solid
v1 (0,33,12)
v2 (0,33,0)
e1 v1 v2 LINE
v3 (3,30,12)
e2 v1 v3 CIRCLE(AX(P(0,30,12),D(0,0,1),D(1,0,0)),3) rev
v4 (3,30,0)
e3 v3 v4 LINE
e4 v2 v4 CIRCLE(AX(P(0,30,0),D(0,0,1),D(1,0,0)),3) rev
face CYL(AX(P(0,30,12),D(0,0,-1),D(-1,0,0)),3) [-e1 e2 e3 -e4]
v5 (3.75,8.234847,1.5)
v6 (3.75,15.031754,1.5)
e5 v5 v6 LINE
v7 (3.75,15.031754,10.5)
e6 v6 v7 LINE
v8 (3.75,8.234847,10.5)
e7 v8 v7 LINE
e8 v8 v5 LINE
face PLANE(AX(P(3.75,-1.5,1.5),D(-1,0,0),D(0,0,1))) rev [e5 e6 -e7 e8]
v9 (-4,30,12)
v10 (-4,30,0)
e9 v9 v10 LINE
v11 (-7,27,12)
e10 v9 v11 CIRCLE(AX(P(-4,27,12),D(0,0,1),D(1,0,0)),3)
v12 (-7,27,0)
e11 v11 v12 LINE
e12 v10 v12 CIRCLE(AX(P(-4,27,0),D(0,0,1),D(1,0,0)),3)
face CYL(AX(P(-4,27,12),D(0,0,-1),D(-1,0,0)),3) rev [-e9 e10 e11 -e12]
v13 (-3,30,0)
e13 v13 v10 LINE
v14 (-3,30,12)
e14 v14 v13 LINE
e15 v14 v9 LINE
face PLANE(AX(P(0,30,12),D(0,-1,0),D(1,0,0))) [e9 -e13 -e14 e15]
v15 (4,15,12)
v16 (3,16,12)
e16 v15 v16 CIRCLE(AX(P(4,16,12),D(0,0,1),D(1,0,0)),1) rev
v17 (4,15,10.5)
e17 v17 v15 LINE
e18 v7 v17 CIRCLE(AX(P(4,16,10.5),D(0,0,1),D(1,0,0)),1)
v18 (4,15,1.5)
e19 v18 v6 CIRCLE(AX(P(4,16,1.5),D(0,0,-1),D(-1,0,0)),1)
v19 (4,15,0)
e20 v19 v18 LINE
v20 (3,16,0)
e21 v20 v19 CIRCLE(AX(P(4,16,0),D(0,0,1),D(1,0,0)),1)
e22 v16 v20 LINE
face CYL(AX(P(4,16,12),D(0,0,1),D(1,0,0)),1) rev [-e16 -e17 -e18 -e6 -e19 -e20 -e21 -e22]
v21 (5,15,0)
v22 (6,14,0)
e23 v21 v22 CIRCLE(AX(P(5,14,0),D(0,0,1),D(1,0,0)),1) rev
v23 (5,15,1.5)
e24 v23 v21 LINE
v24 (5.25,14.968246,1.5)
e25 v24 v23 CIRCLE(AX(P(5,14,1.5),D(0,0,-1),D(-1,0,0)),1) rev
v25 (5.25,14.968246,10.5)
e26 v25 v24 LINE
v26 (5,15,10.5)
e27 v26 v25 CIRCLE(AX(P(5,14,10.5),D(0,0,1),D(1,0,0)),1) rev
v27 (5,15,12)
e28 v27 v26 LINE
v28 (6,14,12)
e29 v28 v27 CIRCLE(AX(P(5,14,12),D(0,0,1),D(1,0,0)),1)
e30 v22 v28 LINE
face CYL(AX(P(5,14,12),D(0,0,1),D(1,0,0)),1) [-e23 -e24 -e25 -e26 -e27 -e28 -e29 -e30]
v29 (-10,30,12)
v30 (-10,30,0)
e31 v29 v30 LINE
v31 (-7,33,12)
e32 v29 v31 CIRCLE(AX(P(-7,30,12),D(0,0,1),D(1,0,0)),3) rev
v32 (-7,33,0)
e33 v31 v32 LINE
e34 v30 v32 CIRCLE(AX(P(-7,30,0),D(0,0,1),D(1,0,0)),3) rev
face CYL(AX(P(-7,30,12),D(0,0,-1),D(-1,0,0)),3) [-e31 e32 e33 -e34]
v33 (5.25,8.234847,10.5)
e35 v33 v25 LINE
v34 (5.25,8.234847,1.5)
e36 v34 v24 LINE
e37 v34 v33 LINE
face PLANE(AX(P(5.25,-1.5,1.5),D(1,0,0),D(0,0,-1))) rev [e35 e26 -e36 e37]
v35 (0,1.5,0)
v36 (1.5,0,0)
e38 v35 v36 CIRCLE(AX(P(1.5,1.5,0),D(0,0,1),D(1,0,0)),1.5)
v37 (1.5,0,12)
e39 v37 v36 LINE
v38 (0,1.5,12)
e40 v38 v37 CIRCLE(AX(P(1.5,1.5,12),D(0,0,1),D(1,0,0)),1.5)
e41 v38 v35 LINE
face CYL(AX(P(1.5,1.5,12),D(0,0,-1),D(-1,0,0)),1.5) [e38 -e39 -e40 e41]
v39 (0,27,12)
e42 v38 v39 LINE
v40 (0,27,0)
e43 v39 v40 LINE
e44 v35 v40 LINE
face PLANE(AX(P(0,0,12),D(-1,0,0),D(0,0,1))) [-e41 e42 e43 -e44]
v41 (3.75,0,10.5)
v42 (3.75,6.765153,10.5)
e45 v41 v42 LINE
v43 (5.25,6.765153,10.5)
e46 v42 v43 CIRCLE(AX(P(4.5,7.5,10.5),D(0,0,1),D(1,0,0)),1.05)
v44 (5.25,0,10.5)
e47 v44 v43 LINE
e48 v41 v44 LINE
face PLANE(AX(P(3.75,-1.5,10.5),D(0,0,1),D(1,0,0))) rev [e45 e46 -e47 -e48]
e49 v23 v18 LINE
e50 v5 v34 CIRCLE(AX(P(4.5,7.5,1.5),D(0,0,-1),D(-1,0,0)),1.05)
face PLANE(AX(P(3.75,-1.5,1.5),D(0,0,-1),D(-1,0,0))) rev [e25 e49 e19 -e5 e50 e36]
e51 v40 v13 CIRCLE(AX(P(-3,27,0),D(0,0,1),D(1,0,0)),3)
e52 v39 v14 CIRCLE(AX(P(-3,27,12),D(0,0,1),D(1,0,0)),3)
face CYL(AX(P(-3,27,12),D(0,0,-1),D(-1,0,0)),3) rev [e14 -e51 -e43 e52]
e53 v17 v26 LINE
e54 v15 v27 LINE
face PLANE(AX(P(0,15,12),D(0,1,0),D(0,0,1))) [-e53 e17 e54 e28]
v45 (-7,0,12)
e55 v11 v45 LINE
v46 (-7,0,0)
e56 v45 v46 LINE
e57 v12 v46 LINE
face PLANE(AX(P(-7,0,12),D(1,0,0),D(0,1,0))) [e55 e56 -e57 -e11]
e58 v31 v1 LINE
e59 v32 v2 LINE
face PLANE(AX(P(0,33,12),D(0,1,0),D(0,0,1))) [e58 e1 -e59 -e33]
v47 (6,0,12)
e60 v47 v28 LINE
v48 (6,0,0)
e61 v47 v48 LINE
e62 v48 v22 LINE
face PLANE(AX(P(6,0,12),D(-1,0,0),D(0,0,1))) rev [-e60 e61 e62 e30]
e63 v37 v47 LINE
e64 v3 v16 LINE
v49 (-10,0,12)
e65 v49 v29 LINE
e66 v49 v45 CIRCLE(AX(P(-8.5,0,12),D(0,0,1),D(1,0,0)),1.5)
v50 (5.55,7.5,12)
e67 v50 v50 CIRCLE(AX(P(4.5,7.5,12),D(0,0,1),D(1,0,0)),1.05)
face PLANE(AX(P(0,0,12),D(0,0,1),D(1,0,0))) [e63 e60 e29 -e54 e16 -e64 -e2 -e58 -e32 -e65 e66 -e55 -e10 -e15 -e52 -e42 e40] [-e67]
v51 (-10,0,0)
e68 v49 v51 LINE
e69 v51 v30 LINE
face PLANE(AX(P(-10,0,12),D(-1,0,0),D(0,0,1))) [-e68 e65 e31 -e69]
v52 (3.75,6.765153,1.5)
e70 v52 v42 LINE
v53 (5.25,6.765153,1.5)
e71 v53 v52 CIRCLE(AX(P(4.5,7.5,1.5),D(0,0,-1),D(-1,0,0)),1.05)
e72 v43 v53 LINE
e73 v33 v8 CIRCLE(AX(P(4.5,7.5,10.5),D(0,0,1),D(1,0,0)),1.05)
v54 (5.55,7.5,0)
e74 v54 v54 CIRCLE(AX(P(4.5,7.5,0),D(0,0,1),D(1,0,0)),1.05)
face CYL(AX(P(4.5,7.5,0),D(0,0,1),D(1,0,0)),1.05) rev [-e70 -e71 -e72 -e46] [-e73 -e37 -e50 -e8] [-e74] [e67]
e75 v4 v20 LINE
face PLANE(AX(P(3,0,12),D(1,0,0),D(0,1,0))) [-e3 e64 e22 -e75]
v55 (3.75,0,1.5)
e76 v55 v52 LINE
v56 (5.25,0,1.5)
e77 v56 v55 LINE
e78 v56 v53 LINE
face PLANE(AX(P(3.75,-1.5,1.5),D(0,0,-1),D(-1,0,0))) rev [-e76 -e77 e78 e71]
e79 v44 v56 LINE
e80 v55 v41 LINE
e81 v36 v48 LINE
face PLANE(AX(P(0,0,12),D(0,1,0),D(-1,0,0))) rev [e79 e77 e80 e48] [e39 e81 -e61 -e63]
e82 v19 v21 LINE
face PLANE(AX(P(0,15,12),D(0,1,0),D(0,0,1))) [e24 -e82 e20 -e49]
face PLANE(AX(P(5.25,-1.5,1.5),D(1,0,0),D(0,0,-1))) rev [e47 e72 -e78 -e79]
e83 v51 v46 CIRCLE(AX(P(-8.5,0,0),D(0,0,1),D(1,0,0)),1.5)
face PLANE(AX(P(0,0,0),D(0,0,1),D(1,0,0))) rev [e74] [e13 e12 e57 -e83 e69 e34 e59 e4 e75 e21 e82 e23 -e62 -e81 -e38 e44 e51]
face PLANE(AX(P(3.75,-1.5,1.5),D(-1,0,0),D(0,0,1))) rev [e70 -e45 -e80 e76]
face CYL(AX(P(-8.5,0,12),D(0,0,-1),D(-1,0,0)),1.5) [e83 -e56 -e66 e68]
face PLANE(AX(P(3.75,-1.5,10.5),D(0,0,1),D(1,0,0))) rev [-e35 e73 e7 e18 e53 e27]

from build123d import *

# Parameters (mm, degrees)
SKETCH1_R           = 1.5
BOSS_EXTRUDE2_DEPTH = 12
SKETCH3_W           = 1.5
SKETCH3_H           = 9
CUT_EXTRUDE2_DEPTH  = 24.832750576
SKETCH4_R           = 1.05
CUT_EXTRUDE3_DEPTH  = 37.510272527
FILLET1_START       = -1
FILLET1_DEPTH       = 14
FILLET1_2_DEPTH     = 12
FILLET1_3_DEPTH     = 1.5
FILLET1_START_2     = 10.5
FILLET1_4_DEPTH     = 1.5


with BuildPart() as part:
    # Sketch1 → Boss-Extrude2 (new body)
    with BuildSketch(Plane.XY):
        with BuildLine():
            ThreePointArc((-10, 0), (-8.5, -1.5), (-7, 0))
            Line((-7, 0), (-10, 0))
        make_face()
        with BuildLine():
            Line((-10, 0), (-7, 0))
            ThreePointArc((-7, 0), (-8.5, 1.5), (-10, 0))
        make_face()
        Polygon((3, 15), (3, 1.5), (3, 0), (6, 0), (6, 15), align=None)
        with BuildLine():
            Line((0, 27), (0, 1.5))
            ThreePointArc((0, 1.5), (1.5, 3), (3, 1.5))
            Line((3, 1.5), (3, 15))
            Line((3, 15), (3, 30))
            ThreePointArc((3, 30), (2.121320344, 32.121320344), (0, 33))
            Line((0, 33), (-7, 33))
            ThreePointArc((-7, 33), (-9.121320344, 32.121320344), (-10, 30))
            Line((-10, 30), (-10, 0))
            ThreePointArc((-10, 0), (-8.5, 1.5), (-7, 0))
            Line((-7, 0), (-7, 27))
            ThreePointArc((-7, 27), (-6.121320344, 29.121320344), (-4, 30))
            Line((-4, 30), (-3, 30))
            ThreePointArc((-3, 30), (-0.878679656, 29.121320344), (0, 27))
        make_face()
        with Locations((1.5, 1.5)):
            Circle(SKETCH1_R)
        with BuildLine():
            ThreePointArc((3, 1.5), (2.560660172, 0.439339828), (1.5, 0))
            Line((1.5, 0), (3, 0))
            Line((3, 0), (3, 1.5))
        make_face()
    extrude(amount=BOSS_EXTRUDE2_DEPTH)

    # Sketch3 → Cut-Extrude2 (cut, through all)
    with BuildSketch(Plane(origin=(0, 15, 0), x_dir=(1, 0, 0), z_dir=(0, 1, 0))):
        with Locations((4.5, -6)):
            Rectangle(SKETCH3_W, SKETCH3_H)
    extrude(amount=-CUT_EXTRUDE2_DEPTH, mode=Mode.SUBTRACT)

    # Sketch4 → Cut-Extrude3 (cut, through all)
    with BuildSketch(Plane.XY.offset(12)):
        with Locations((4.5, 7.5)):
            Circle(SKETCH4_R)
    extrude(amount=-CUT_EXTRUDE3_DEPTH, mode=Mode.SUBTRACT)

    # Fillet1: read off the stored shape, not the designer's step
    # Fillet1 outline → Fillet1 (cut)
    with BuildSketch(Plane.XY.offset(FILLET1_START)):
        with BuildLine():
            Line((6, 14), (6, 15))
            Line((6, 15), (5, 15))
            ThreePointArc((5, 15), (5.707106781, 14.707106781), (6, 14))
        make_face()
    extrude(amount=FILLET1_DEPTH, mode=Mode.SUBTRACT)

    # Fillet1 2 outline → Fillet1 2 (add)
    with BuildSketch(Plane.XY):
        with BuildLine():
            Line((3.75, 15), (3.75, 15.031754164))
            ThreePointArc((3.75, 15.031754164), (3.209430585, 15.387627564), (3, 16))
            Line((3, 16), (3, 15))
            Line((3, 15), (3.75, 15))
        make_face()
    extrude(amount=FILLET1_2_DEPTH)

    # Fillet1 3 outline → Fillet1 3 (add)
    with BuildSketch(Plane.XY):
        with BuildLine():
            Line((3.75, 15), (4, 15))
            ThreePointArc((4, 15), (3.873995708, 15.007970304), (3.75, 15.031754164))
            Line((3.75, 15.031754164), (3.75, 15))
        make_face()
    extrude(amount=FILLET1_3_DEPTH)

    # Fillet1 4 outline → Fillet1 4 (add)
    with BuildSketch(Plane.XY.offset(FILLET1_START_2)):
        with BuildLine():
            Line((3.75, 15), (4, 15))
            ThreePointArc((4, 15), (3.873995708, 15.007970304), (3.75, 15.031754164))
            Line((3.75, 15.031754164), (3.75, 15))
        make_face()
    extrude(amount=FILLET1_4_DEPTH)


solid = part.part
